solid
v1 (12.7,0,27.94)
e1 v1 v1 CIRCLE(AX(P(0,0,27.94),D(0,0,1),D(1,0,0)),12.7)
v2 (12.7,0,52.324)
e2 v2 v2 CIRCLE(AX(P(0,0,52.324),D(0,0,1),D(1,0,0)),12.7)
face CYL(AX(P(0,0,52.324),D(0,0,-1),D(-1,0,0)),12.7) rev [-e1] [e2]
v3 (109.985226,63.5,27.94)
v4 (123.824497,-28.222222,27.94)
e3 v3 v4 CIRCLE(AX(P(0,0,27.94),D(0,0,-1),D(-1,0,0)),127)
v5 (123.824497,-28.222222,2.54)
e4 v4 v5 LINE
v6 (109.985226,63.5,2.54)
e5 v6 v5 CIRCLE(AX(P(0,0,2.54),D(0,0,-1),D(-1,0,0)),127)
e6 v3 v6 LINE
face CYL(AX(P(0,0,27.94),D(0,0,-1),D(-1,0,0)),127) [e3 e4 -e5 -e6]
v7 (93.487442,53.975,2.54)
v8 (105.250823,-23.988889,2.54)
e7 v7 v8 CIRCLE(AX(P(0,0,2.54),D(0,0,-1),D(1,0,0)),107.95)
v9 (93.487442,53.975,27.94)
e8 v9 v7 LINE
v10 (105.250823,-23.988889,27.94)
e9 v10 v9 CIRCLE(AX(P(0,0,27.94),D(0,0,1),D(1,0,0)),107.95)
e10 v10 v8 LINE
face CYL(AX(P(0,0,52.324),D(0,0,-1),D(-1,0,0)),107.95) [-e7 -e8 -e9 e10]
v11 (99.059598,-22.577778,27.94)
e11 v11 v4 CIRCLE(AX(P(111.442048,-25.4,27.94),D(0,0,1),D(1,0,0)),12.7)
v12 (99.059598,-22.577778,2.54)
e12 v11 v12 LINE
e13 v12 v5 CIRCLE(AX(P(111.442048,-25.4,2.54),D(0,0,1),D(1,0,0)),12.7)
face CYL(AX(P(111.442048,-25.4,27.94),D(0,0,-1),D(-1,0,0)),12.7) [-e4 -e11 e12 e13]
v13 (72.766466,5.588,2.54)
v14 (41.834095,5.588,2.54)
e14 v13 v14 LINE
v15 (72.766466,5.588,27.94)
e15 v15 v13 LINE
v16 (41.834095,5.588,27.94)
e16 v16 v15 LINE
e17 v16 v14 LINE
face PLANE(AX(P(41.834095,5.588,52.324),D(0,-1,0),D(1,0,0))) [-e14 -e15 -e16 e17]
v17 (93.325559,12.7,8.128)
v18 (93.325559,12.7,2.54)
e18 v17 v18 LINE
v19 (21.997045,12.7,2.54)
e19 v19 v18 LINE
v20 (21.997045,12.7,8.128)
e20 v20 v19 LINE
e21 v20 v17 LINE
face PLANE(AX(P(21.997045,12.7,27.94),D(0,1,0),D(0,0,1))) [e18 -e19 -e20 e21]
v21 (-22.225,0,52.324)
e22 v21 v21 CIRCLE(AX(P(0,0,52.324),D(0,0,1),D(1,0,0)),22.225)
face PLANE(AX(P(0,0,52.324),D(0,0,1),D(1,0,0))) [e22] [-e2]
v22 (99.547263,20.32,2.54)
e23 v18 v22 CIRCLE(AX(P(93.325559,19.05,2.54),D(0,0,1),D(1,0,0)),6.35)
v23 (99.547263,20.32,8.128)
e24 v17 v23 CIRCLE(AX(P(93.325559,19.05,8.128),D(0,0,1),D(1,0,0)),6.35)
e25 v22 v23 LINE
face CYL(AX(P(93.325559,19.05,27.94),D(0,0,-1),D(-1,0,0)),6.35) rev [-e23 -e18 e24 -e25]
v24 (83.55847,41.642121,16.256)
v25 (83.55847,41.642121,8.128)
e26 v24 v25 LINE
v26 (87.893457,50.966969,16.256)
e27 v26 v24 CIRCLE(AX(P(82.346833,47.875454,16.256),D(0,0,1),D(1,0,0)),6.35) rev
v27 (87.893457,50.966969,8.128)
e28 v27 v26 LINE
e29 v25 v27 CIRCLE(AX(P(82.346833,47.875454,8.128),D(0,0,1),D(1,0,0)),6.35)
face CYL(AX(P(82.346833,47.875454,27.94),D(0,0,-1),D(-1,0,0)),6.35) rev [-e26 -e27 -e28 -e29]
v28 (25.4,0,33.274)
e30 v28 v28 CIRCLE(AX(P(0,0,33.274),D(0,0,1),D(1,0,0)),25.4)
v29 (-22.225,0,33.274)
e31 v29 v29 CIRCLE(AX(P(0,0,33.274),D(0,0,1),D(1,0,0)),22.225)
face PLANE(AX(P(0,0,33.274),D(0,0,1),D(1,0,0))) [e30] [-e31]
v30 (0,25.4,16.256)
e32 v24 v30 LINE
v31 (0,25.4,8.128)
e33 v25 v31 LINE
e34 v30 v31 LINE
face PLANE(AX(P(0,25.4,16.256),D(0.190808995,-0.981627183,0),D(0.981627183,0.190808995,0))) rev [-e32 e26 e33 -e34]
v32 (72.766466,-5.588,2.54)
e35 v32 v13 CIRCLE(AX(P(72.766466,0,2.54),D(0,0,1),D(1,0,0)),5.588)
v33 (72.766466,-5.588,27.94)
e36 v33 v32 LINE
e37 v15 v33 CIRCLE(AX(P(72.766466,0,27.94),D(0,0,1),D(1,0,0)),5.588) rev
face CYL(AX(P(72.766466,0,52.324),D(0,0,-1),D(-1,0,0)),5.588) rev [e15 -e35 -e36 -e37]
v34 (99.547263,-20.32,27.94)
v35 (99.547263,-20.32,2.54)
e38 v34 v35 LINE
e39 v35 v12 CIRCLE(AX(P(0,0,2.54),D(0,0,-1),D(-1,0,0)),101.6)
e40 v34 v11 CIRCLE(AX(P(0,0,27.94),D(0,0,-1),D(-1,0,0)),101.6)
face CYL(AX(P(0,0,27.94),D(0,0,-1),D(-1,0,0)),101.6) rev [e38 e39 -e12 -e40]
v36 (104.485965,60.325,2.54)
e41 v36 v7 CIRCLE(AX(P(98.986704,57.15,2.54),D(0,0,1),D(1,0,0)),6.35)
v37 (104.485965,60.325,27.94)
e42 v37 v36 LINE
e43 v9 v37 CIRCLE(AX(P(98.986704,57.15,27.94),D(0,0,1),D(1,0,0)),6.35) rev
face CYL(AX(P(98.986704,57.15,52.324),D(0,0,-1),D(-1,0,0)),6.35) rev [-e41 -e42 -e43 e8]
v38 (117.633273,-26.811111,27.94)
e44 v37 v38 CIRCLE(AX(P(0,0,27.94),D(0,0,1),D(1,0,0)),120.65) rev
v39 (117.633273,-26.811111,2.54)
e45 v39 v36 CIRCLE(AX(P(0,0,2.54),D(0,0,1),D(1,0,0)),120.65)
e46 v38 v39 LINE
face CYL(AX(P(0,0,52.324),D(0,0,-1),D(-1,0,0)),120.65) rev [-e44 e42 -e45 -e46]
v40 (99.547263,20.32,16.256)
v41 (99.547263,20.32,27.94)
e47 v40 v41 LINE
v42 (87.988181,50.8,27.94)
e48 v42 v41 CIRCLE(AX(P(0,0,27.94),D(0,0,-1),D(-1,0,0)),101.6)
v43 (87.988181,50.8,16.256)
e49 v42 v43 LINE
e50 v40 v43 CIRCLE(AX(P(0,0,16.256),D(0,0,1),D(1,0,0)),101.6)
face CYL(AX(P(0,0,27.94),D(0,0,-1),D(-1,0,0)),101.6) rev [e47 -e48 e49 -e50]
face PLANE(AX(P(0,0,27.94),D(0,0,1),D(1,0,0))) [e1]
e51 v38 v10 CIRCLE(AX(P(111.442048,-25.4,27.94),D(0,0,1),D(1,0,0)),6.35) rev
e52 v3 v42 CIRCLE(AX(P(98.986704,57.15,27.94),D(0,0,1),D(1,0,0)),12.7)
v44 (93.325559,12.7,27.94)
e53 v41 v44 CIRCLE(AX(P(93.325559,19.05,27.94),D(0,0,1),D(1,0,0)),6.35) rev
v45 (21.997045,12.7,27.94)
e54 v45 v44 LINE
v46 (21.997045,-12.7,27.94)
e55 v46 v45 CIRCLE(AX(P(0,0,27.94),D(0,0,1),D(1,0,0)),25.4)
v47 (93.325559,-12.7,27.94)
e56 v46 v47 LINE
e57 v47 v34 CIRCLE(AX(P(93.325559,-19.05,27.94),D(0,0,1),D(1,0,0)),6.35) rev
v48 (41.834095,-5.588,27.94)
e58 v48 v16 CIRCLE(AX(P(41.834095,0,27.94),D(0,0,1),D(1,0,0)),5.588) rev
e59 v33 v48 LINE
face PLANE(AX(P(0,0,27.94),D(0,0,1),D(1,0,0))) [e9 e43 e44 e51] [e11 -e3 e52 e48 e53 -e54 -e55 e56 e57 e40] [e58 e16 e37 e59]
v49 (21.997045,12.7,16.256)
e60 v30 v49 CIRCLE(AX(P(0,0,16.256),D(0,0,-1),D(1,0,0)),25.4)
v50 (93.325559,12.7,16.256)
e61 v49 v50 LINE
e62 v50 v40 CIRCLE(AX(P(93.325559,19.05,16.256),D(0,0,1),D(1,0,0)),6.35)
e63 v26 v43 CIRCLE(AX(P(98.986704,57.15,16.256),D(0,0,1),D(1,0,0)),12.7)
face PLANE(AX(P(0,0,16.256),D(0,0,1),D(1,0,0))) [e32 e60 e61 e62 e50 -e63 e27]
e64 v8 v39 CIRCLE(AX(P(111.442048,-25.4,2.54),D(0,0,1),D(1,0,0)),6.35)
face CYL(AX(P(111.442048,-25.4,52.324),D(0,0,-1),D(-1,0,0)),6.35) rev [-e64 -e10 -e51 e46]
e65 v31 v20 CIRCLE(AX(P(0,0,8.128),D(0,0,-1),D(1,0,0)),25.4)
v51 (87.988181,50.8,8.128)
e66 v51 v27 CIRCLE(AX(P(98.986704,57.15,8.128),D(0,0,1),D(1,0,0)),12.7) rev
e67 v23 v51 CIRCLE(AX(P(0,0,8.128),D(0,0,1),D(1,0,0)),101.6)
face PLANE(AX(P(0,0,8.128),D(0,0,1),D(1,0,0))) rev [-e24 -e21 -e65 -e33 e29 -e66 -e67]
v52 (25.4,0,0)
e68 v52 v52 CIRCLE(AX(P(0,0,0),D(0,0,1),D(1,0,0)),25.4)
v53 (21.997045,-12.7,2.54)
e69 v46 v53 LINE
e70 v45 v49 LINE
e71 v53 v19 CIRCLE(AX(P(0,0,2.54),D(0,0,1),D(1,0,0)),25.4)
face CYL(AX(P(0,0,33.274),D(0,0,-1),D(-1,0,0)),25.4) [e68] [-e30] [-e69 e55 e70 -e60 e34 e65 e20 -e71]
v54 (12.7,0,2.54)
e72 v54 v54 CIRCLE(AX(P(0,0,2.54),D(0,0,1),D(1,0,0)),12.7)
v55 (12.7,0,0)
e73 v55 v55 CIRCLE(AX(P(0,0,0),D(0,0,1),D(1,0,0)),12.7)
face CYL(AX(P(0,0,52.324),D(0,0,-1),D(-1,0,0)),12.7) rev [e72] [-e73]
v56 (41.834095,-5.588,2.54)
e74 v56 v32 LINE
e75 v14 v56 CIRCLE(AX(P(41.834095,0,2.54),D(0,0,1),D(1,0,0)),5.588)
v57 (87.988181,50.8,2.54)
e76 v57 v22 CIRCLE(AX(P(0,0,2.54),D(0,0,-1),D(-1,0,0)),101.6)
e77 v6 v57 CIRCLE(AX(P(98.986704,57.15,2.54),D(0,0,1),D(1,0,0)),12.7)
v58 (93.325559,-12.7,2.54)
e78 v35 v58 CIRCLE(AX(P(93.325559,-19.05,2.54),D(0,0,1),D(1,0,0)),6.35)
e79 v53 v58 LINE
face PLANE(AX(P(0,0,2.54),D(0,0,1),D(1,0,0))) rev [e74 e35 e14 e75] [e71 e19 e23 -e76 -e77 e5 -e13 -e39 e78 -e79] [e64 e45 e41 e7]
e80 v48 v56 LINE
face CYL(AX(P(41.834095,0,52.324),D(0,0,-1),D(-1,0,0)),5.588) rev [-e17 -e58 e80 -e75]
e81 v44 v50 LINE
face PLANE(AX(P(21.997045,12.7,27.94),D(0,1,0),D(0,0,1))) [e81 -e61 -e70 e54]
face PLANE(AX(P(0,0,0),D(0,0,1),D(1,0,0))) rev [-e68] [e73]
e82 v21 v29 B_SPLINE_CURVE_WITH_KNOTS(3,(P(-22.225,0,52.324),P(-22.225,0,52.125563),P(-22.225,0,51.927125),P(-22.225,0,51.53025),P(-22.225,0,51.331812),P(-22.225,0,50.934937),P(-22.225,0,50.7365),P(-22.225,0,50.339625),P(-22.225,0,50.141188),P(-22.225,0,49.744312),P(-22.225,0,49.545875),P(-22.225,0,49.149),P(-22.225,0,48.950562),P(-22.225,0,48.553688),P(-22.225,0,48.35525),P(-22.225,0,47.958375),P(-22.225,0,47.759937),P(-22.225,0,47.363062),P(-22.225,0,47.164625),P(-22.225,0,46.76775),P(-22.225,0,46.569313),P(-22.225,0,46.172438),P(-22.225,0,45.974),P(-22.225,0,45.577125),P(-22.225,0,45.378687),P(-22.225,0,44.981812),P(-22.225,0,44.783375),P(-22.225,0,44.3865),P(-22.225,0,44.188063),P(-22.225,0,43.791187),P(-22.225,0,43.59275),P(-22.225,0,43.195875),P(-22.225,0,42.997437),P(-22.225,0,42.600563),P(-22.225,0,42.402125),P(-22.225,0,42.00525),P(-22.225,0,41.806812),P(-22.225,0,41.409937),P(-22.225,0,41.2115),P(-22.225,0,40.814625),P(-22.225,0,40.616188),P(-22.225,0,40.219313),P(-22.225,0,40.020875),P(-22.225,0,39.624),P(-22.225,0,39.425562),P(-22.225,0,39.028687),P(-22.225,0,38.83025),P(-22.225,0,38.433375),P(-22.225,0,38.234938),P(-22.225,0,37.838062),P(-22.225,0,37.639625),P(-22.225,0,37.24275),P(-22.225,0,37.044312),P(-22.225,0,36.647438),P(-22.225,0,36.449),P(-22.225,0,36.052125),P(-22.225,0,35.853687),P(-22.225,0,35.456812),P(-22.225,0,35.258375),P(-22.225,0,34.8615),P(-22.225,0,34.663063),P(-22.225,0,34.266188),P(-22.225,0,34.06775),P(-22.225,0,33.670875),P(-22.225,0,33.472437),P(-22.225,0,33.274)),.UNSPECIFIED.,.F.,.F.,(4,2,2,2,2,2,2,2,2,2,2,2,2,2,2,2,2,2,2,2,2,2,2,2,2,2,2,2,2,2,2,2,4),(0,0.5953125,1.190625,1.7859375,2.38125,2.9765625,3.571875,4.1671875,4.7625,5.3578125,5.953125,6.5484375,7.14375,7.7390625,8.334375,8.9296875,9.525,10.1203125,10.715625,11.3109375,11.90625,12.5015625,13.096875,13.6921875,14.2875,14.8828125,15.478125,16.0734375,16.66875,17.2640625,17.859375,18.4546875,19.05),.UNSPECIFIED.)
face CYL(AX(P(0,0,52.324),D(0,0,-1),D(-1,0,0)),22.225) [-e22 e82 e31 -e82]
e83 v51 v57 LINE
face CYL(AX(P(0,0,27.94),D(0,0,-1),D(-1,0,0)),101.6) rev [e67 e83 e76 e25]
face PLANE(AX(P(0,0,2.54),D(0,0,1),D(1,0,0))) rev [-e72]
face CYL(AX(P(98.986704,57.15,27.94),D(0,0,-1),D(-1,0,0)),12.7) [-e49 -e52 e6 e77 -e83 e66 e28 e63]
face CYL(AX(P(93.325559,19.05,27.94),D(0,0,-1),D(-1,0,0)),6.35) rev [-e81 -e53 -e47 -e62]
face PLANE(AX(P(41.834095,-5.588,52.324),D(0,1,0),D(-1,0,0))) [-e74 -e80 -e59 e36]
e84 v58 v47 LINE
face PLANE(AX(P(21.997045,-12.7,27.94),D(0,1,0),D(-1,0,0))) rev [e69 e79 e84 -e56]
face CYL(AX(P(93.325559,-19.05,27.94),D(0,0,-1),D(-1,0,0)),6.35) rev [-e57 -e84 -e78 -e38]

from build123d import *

# Parameters (mm, degrees)
SKETCH1_R           = 25.4
BOSS_EXTRUDE2_DEPTH = 33.274
SKETCH2_R           = 22.225
BOSS_EXTRUDE3_DEPTH = 19.05
SKETCH3_R           = 12.7
CUT_EXTRUDE1_DEPTH  = 64.467479673
BOSS_EXTRUDE4_DEPTH = 25.4
FILLET1_R           = 6.35
CUT_EXTRUDE3_DEPTH  = 154.252958066
BOSS_EXTRUDE5_DEPTH = 8.128
FILLET2_R           = 6.35


with BuildPart() as part:
    # Sketch1 → Boss-Extrude2 (new body)
    with BuildSketch(Plane.XY):
        Circle(SKETCH1_R)
    extrude(amount=BOSS_EXTRUDE2_DEPTH)

    # Sketch2 → Boss-Extrude3 (add)
    with BuildSketch(Plane.XY.offset(33.274)):
        with Locations(Location((0, 0, 0), (0, 0, 180))):
            Circle(SKETCH2_R)
    extrude(amount=BOSS_EXTRUDE3_DEPTH)

    # Sketch3 → Cut-Extrude1 (cut, through all)
    with BuildSketch(Plane.XY):
        Circle(SKETCH3_R)
    extrude(amount=CUT_EXTRUDE1_DEPTH, mode=Mode.SUBTRACT)

    # Sketch6 → Boss-Extrude4 (add)
    with BuildSketch(Plane.XY.offset(2.54)):
        with BuildLine():
            Line((21.997045256, 12.7), (100.803124952, 12.7))
            ThreePointArc((100.803124952, 12.7), (96.298711326, 32.390094118), (87.988181024, 50.8))
            ThreePointArc((87.988181024, 50.8), (92.636703653, 68.148522628), (109.985226281, 63.5))
            ThreePointArc((109.985226281, 63.5), (125.578613792, 18.9476056), (123.824497467, -28.222222222))
            ThreePointArc((123.824497467, -28.222222222), (108.619825498, -37.782449747), (99.059597973, -22.577777778))
            ThreePointArc((99.059597973, -22.577777778), (100.053333913, -17.660418251), (100.803124952, -12.7))
            Line((100.803124952, -12.7), (21.997045256, -12.7))
            ThreePointArc((21.997045256, -12.7), (-25.4, 0), (21.997045256, 12.7))
        make_face()
    extrude(amount=BOSS_EXTRUDE4_DEPTH)

    # Fillet1
    fillet1_edges = [part.edges().sort_by_distance(p)[0] for p in [
        (100.803124952, -12.7, 15.24),
        (100.803124952, 12.7, 15.24),
    ]]
    fillet(fillet1_edges, radius=FILLET1_R)

    # Sketch7 → Cut-Extrude3 (cut, through all)
    with BuildSketch(Plane.XY.offset(2.54)):
        with BuildLine():
            Line((41.834095467, -5.588), (72.766466105, -5.588))
            ThreePointArc((72.766466105, -5.588), (78.354466105, 0), (72.766466105, 5.588))
            Line((72.766466105, 5.588), (41.834095467, 5.588))
            ThreePointArc((41.834095467, 5.588), (36.246095467, 0), (41.834095467, -5.588))
        make_face()
        with BuildLine():
            ThreePointArc((117.633272593, -26.811111111), (119.299683103, 18.00022532), (104.485964967, 60.325))
            ThreePointArc((104.485964967, 60.325), (95.811703653, 62.649261314), (93.487442339, 53.975))
            ThreePointArc((93.487442339, 53.975), (106.741821724, 16.10546476), (105.250822847, -23.988888889))
            ThreePointArc((105.250822847, -23.988888889), (110.030936609, -31.591224873), (117.633272593, -26.811111111))
        make_face()
    extrude(amount=CUT_EXTRUDE3_DEPTH, mode=Mode.SUBTRACT)

    # Sketch8 → Boss-Extrude5 (add)
    with BuildSketch(Plane.XY.offset(8.128)):
        with BuildLine():
            Line((21.997045256, 12.7), (93.3255592, 12.7))
            ThreePointArc((93.3255592, 12.7), (98.24424805, 15.033907372), (99.547263147, 20.32))
            ThreePointArc((99.547263147, 20.32), (96.421789325, 32.021844783), (91.925992057, 43.268602754))
            Line((91.925992057, 43.268602754), (0, 25.4))
            ThreePointArc((0, 25.4), (12.7, 21.997045256), (21.997045256, 12.7))
        make_face()
    extrude(amount=BOSS_EXTRUDE5_DEPTH)

    # Fillet2
    # the kernel refuses this fillet: 6.35 mm, written as the material it adds along each edge
    with BuildSketch(Plane(origin=(91.925992057, 43.268602754, 8.128), x_dir=(-0.46401221312407714, 0.8858288017849137, 0), z_dir=(0, 0, 1))) as fillet2_piece_1:
        with BuildLine():
            CenterArc((8.525728186, 6.347859775), FILLET2_R, 163.353687105, 108.13393528)
            Line((2.441848203, 8.166899178), (1.833460205, 8.348803118))
            Line((1.833460205, 8.348803118), (-0.608387998, 0.18190394))
            Line((-0.608387998, 0.18190394), (-0.027038803, -0.634424072))
            ThreePointArc((-0.027038803, -0.634424072), (8.524799214, -0.640898159), (8.707065713, -0.634785977))
            Line((8.707065713, -0.634785977), (8.690580483, 0))
        make_face()
    extrude(amount=8.128)


solid = part.part
